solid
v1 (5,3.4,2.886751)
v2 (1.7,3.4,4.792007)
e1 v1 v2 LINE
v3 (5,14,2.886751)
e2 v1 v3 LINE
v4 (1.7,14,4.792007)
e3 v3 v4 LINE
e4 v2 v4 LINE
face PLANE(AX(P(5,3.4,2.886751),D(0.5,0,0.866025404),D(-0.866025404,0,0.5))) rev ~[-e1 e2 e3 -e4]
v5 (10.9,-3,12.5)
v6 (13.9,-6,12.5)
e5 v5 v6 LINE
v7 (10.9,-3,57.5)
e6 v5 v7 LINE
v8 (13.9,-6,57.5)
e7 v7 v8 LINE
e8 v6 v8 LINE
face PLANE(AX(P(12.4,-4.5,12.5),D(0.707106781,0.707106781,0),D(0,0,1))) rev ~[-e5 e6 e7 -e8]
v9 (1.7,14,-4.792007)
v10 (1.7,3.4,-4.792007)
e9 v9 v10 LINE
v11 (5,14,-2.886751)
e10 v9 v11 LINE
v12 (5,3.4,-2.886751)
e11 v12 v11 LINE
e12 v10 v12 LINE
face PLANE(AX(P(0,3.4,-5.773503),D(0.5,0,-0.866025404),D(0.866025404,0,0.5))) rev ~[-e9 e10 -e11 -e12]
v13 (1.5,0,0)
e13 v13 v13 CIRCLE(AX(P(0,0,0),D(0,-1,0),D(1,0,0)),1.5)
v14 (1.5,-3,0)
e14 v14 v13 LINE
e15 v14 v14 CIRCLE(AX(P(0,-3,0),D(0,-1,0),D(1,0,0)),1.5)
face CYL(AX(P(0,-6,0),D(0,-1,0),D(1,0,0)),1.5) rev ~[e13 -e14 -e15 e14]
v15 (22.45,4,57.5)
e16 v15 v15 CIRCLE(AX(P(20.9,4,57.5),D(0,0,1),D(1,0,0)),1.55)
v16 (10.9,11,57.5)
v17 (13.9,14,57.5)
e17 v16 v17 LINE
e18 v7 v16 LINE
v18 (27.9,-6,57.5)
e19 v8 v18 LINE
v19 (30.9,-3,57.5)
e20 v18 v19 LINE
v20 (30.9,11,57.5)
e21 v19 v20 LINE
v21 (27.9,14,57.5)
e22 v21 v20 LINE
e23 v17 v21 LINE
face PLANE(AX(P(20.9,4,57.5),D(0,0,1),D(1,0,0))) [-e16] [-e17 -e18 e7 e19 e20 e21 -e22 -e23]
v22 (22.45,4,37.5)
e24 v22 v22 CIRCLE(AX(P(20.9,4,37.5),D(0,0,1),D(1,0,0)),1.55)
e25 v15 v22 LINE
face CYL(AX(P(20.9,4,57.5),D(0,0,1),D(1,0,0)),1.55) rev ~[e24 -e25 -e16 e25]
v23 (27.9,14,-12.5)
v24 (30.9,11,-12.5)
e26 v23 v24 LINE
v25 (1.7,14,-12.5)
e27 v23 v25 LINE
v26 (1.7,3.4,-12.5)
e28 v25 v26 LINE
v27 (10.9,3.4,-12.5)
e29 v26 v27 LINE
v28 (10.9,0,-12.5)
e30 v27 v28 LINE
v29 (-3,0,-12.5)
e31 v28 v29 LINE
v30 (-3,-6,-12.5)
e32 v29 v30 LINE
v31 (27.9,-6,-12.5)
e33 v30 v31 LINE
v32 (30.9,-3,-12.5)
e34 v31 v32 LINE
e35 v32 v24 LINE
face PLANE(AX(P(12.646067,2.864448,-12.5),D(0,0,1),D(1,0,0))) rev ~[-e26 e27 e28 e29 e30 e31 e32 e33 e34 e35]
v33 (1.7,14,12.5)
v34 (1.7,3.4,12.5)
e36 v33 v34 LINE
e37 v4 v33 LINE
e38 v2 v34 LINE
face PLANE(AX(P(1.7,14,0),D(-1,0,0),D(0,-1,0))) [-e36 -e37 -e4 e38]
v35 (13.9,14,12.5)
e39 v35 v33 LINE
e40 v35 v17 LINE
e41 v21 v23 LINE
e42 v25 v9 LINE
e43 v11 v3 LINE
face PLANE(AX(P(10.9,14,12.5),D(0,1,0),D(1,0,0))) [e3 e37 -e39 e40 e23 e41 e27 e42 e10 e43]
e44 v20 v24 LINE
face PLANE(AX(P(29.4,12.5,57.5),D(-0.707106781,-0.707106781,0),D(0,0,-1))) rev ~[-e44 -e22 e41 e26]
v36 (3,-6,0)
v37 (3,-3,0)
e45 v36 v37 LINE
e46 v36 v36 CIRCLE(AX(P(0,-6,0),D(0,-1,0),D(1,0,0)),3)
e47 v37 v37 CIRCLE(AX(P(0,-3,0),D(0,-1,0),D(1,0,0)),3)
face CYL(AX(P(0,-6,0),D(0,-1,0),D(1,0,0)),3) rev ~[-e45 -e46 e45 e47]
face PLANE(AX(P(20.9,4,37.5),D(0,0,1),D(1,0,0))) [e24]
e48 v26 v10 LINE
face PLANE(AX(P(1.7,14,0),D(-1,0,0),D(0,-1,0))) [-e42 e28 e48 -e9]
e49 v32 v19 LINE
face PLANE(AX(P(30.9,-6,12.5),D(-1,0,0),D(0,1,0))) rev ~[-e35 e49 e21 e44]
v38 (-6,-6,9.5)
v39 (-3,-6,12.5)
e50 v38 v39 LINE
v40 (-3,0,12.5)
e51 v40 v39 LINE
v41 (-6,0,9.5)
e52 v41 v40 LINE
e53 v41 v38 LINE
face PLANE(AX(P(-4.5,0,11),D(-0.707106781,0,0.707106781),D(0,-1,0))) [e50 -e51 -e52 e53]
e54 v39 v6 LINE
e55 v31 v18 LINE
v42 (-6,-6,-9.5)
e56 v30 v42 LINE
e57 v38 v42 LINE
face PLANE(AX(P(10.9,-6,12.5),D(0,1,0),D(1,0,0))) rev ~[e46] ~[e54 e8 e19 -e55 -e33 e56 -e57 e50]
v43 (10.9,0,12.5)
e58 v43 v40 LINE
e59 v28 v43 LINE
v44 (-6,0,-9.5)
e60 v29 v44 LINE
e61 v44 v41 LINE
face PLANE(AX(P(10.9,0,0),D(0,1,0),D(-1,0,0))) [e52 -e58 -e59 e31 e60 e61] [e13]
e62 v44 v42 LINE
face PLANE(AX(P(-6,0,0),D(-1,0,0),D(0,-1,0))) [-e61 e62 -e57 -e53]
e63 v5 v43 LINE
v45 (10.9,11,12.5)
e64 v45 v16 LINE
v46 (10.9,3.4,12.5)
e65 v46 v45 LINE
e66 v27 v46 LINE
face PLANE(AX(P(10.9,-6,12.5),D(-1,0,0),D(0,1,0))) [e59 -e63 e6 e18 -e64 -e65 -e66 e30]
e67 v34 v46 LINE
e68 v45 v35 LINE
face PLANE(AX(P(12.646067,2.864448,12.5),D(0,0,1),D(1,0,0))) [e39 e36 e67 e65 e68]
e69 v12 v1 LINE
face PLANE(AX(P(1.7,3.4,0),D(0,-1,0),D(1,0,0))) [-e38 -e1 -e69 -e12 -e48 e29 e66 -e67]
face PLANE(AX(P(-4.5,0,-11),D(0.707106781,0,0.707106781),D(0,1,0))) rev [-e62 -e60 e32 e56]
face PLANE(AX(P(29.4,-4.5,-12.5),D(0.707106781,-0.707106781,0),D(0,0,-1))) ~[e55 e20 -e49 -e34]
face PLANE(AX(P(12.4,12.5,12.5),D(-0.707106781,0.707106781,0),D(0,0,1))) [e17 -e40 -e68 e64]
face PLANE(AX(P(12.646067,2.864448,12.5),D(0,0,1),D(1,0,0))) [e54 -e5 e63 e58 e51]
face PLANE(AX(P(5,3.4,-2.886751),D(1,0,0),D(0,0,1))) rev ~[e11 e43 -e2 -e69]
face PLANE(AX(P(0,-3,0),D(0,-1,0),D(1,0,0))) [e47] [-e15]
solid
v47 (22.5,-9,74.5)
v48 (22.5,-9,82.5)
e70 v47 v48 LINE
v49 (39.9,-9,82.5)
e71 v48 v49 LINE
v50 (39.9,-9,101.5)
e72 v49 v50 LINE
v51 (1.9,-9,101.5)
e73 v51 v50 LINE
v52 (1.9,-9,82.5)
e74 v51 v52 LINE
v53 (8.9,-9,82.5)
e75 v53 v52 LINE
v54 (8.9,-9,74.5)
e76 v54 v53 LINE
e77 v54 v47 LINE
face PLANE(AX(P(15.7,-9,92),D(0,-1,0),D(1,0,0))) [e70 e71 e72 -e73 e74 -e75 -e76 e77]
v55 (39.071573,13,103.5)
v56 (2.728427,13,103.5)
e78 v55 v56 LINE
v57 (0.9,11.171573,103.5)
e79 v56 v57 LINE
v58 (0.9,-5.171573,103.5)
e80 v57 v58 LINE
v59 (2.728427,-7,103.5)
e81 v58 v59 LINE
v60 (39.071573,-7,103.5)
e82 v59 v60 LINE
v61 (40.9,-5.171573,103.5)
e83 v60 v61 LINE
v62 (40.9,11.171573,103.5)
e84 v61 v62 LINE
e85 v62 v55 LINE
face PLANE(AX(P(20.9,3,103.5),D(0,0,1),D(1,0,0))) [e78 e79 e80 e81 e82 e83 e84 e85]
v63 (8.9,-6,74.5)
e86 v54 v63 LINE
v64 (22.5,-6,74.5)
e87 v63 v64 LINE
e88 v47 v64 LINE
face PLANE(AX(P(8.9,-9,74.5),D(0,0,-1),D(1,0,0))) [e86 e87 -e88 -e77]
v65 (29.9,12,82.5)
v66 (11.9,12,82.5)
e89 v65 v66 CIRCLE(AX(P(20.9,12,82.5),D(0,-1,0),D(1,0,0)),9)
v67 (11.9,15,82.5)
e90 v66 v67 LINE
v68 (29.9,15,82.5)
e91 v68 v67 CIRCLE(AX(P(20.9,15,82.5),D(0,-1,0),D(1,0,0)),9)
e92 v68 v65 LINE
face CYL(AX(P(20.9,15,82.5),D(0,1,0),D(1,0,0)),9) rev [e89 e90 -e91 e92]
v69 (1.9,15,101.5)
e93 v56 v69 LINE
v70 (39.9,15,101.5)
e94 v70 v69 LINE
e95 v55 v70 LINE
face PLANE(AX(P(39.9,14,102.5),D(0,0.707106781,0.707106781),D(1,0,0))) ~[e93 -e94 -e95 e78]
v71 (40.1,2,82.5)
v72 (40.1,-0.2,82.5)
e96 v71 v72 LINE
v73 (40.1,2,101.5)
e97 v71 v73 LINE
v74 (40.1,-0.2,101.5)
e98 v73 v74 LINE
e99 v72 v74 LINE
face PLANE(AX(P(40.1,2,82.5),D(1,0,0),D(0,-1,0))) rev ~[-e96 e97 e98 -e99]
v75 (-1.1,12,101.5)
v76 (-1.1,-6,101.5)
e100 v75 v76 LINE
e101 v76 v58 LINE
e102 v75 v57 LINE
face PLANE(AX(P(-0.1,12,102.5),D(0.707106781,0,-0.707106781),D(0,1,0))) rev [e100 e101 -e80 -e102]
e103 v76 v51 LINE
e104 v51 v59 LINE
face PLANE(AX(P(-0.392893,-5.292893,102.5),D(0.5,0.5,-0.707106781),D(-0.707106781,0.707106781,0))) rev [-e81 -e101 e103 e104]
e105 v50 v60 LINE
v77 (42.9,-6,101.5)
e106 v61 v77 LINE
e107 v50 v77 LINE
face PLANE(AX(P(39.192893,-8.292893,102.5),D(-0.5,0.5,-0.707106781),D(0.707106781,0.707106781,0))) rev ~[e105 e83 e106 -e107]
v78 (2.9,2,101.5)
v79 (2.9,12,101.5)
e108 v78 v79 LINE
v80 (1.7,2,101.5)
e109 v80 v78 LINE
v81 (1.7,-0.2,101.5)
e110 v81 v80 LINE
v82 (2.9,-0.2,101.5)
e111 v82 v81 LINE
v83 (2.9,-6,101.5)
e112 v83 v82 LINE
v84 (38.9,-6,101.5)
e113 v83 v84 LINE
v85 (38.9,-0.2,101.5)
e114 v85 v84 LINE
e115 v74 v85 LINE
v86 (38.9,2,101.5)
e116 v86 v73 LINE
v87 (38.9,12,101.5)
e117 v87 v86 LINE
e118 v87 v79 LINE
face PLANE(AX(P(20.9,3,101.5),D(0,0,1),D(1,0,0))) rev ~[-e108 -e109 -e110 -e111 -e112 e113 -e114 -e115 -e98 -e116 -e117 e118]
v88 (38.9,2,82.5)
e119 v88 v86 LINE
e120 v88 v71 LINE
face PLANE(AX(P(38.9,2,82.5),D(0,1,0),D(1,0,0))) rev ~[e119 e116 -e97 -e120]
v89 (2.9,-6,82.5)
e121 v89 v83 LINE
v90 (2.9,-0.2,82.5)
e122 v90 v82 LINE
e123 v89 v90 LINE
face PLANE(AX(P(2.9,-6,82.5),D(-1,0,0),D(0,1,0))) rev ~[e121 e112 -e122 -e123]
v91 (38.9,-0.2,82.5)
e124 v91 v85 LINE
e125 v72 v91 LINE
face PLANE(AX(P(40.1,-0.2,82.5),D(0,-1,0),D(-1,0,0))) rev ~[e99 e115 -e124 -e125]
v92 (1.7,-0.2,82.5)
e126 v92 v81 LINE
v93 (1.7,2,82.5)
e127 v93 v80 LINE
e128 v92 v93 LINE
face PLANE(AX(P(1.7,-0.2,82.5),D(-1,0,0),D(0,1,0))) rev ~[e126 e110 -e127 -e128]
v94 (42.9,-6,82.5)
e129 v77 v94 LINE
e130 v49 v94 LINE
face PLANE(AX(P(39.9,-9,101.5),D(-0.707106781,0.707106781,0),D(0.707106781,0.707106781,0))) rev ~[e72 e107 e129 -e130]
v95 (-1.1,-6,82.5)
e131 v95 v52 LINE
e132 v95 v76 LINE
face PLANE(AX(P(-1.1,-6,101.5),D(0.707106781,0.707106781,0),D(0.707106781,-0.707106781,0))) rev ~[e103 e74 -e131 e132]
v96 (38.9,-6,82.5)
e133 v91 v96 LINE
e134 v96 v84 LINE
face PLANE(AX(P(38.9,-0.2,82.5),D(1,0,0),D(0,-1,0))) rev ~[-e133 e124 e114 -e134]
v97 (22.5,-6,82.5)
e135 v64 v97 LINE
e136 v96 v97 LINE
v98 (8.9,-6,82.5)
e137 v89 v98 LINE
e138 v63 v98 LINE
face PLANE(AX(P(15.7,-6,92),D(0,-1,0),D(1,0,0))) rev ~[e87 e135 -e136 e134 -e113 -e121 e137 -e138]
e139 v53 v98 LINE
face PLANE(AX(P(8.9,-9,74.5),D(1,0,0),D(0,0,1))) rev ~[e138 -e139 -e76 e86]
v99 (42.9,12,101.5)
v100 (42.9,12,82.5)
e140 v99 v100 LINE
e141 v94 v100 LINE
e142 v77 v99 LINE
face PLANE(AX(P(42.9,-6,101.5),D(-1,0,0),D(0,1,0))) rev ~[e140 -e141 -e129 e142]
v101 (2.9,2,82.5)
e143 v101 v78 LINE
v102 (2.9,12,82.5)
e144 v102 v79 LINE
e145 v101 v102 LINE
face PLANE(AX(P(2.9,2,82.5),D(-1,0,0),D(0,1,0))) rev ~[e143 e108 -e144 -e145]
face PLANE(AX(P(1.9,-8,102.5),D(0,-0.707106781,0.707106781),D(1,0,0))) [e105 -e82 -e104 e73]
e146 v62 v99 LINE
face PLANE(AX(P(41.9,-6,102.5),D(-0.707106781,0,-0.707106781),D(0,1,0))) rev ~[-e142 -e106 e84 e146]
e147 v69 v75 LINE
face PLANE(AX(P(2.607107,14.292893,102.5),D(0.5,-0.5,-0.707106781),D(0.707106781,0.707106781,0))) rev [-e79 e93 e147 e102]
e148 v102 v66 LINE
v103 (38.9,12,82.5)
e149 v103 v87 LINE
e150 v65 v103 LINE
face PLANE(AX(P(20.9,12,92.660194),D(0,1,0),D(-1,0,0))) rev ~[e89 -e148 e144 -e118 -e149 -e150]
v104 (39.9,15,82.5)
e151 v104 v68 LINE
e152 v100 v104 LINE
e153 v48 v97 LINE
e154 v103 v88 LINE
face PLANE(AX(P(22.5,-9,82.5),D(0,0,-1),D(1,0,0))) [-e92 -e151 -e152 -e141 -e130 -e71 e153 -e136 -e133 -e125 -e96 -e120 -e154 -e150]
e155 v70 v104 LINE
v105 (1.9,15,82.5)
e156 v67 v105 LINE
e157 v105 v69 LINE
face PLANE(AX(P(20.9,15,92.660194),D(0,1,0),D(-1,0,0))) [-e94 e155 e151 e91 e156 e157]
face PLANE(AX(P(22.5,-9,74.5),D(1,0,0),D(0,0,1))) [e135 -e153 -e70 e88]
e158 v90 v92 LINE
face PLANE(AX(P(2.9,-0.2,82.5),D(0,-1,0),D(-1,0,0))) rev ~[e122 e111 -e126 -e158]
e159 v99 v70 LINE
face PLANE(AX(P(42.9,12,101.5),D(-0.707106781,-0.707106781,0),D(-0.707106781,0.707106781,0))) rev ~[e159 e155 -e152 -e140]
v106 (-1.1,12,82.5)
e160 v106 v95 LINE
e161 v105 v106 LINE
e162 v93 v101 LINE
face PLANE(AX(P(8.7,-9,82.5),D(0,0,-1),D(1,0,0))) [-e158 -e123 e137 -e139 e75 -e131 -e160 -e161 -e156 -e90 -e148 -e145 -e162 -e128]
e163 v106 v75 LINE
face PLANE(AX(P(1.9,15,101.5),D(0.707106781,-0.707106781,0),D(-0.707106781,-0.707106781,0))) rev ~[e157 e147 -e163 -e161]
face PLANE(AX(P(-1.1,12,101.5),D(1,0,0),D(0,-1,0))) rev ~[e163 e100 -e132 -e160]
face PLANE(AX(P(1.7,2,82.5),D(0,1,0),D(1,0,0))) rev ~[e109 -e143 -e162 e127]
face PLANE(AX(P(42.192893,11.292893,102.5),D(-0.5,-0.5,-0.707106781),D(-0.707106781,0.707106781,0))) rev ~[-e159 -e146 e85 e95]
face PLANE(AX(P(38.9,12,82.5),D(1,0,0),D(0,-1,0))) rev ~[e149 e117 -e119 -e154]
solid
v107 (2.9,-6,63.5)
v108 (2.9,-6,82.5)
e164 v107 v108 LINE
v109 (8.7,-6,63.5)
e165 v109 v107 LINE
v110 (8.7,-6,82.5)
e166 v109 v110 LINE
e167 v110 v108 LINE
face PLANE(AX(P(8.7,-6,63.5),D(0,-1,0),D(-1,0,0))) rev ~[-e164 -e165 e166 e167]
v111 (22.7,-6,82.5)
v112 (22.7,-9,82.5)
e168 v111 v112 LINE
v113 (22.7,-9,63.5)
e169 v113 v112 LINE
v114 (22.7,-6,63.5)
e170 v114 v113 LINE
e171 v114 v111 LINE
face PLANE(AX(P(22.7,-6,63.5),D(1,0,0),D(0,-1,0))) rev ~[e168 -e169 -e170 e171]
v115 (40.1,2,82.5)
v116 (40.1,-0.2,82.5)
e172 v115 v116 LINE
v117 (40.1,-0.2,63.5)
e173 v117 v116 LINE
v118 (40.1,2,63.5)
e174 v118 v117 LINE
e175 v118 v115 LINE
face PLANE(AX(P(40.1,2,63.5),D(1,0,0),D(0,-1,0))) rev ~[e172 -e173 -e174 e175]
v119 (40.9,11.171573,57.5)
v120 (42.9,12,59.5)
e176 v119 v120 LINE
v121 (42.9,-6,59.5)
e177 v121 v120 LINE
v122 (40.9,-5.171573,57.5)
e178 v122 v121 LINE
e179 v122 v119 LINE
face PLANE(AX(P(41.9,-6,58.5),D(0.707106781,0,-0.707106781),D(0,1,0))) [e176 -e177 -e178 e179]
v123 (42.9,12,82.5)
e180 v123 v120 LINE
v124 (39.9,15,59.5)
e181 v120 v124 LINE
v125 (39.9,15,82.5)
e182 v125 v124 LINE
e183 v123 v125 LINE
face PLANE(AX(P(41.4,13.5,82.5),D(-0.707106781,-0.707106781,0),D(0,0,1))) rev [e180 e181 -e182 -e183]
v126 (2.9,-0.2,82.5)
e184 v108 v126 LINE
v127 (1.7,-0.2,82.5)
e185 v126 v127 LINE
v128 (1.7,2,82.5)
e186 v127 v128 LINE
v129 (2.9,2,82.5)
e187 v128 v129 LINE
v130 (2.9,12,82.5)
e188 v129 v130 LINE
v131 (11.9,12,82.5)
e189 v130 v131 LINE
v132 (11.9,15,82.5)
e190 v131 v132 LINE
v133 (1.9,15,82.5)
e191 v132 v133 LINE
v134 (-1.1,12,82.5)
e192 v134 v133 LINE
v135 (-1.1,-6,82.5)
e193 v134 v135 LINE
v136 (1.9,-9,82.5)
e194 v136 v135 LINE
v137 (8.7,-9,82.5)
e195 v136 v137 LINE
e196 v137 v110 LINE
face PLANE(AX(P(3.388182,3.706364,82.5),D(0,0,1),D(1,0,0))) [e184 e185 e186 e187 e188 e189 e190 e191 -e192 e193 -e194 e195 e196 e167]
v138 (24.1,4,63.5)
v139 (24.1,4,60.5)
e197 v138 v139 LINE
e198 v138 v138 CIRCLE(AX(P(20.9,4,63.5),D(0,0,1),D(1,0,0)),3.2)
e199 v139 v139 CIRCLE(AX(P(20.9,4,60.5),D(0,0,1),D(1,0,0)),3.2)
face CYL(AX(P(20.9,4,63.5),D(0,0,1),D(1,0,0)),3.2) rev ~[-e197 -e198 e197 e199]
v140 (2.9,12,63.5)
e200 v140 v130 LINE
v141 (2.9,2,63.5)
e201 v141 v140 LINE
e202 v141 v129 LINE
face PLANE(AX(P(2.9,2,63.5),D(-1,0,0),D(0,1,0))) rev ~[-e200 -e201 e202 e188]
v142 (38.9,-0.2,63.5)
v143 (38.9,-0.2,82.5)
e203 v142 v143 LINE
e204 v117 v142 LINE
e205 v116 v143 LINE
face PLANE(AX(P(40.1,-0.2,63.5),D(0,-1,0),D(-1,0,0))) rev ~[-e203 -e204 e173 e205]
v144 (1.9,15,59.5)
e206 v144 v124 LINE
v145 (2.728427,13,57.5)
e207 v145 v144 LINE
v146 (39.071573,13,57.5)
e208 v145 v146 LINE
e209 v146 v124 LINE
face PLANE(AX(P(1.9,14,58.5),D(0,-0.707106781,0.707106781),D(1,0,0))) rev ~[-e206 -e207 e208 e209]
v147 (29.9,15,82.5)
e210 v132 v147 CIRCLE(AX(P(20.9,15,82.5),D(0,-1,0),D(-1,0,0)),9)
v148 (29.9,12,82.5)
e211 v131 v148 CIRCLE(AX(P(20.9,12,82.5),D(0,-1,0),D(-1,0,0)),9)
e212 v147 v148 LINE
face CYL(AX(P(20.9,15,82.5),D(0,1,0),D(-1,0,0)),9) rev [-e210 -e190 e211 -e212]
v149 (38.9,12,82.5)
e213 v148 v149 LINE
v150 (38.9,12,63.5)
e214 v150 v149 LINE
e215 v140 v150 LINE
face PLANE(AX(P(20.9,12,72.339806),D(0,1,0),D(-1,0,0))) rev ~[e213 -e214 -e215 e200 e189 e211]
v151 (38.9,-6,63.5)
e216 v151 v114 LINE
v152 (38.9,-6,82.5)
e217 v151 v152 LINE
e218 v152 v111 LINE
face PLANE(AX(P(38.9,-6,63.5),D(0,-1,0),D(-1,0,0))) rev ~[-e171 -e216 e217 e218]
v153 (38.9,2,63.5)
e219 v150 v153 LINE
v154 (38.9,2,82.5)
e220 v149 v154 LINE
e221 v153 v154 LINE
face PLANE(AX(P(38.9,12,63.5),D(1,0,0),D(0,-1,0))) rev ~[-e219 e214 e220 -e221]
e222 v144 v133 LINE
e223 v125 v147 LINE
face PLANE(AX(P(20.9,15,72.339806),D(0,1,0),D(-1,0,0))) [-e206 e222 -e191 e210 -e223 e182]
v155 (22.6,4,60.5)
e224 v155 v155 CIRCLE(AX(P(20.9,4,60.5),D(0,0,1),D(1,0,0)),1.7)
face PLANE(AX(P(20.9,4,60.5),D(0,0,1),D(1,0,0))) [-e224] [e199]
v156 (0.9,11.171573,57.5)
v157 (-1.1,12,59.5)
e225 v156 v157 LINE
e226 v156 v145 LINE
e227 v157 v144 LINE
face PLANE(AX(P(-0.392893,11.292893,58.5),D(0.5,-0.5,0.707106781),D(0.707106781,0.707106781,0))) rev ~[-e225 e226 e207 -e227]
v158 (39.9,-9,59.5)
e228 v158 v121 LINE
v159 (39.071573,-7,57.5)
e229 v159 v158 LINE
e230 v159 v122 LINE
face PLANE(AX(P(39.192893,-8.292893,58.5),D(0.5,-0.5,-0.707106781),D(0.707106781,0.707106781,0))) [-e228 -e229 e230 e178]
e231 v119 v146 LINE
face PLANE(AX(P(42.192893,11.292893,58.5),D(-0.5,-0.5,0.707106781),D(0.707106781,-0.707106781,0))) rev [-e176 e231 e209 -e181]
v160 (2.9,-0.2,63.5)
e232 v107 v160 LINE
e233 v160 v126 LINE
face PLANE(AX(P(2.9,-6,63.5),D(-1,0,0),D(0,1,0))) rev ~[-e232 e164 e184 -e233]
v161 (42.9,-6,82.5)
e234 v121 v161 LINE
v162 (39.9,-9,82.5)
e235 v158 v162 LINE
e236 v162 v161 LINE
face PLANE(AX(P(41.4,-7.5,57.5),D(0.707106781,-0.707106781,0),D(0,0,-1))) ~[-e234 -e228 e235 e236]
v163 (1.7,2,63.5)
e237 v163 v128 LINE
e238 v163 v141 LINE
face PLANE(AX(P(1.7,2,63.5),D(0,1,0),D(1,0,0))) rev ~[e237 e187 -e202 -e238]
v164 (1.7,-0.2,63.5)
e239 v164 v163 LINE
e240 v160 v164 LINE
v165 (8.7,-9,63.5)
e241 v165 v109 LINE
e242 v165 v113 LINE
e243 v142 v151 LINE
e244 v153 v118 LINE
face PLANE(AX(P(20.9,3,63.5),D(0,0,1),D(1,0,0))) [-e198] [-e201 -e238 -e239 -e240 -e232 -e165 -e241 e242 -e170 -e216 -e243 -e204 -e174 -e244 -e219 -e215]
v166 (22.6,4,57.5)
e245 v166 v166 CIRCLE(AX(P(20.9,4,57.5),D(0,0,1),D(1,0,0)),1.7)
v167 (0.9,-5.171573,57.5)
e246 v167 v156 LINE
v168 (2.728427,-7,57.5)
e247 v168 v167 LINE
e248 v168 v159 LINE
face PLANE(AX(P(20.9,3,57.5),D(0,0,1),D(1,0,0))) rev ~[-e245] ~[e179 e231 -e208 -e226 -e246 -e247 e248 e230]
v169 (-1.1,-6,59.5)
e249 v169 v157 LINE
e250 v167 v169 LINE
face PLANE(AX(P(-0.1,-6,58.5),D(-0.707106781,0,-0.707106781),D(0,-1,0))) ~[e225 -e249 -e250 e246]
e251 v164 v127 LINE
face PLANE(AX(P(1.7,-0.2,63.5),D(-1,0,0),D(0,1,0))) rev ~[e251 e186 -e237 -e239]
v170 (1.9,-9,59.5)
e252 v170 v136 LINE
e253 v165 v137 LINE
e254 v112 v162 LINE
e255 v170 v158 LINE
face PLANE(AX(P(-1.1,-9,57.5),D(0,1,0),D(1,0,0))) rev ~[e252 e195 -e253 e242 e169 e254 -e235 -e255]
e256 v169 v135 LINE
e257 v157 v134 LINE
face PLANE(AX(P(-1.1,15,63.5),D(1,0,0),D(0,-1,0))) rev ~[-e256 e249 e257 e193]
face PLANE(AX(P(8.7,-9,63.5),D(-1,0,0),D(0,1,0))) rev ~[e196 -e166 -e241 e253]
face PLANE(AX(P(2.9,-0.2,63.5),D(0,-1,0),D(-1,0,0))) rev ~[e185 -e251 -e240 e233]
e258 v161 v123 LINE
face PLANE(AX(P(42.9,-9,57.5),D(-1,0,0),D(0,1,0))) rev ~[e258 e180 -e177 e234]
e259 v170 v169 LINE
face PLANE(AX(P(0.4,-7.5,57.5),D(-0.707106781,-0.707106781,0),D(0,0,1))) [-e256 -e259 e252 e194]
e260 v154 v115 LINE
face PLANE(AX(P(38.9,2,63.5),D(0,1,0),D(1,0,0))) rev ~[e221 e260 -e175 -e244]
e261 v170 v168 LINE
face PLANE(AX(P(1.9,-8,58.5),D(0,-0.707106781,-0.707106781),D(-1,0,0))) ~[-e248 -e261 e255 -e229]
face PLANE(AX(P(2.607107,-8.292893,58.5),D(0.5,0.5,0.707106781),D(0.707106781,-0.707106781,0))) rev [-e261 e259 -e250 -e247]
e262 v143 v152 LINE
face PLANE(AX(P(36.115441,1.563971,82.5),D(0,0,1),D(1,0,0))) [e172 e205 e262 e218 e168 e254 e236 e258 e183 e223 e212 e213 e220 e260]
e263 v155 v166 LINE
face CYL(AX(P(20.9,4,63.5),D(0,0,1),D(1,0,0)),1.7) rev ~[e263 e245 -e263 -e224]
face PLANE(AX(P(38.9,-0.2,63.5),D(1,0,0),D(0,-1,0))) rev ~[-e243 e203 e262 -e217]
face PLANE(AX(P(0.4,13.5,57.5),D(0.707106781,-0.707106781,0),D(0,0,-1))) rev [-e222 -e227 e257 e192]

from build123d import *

# Parameters (mm, degrees)
F1_DEPTH   = 12.5
F2_R       = 1.5
F3_DEPTH   = 6
F4_R       = 3
F5_DEPTH   = 3
F7_DEPTH   = 10.6
F8_W       = 20
F8_H       = 20
F9_DEPTH   = 45
F10_R      = 1.55
F11_DEPTH  = 20
F12_SIZE   = 3
F13_W      = 44
F13_H      = 24
F14_DEPTH  = 6
F16_DEPTH  = 19
F18_DEPTH  = 3
F19_SIZE   = 3
F21_DEPTH  = 19
F23_DEPTH  = 2
F24_W      = 13.6
F24_H      = 8
F25_DEPTH  = 3
F27_DEPTH  = 3
F28_SIZE   = 2
F28_2_SIZE = 2
F29_R      = 1.7
F30_DEPTH  = 6
F31_R      = 3.2
F32_DEPTH  = 3
F33_SIZE   = 3


with BuildPart() as f1:
    # F0 (on Top) → F1 (new body, symmetric)
    with BuildSketch(Plane.XY):
        Polygon((30.9, 14), (1.7, 14), (1.7, 3.4), (10.9, 3.4), (10.9, 0), (-6, 0), (-6, -6), (30.9, -6), align=None)
    extrude(amount=F1_DEPTH, both=True)

    # F2 (on face) → F3 (cut, through all)
    with BuildSketch(Plane.XZ.offset(6)):
        Circle(F2_R)
    extrude(amount=-F3_DEPTH, mode=Mode.SUBTRACT)

    # F4 (on face) → F5 (cut)
    with BuildSketch(Plane.XZ.offset(6)):
        Circle(F4_R)
    extrude(amount=-F5_DEPTH, mode=Mode.SUBTRACT)

    # F6 (on face) → F7 (cut, through all)
    with BuildSketch(Plane.XZ.offset(-3.4)):
        Polygon((5, -2.8867513459), (5, 2.8867513459), (0, 5.7735026919), (-5, 2.8867513459), (-5, -2.8867513459), (0, -5.7735026919), align=None)
    extrude(amount=-F7_DEPTH, mode=Mode.SUBTRACT)

    # F8 (on face) → F9 (join)
    with BuildSketch(Plane.XY.offset(12.5)):
        with Locations((20.9, 4)):
            Rectangle(F8_W, F8_H)
    extrude(amount=F9_DEPTH)

    # F10 (on face) → F11 (cut)
    with BuildSketch(Plane.XY.offset(57.5)):
        with Locations((20.9, 4)):
            Circle(F10_R)
    extrude(amount=-F11_DEPTH, mode=Mode.SUBTRACT)

    # F12
    f12_edges = [f1.edges().sort_by_distance(p)[0] for p in [
        (10.9, 14, 35),
        (10.9, -6, 35),
        (30.9, -6, 22.5),
        (30.9, 14, 22.5),
    ]]
    chamfer(f12_edges, length=F12_SIZE)

    # F33
    f33_edges = [f1.edges().sort_by_distance(p)[0] for p in [
        (-6, -3, 12.5),
        (-6, -3, -12.5),
    ]]
    chamfer(f33_edges, length=F33_SIZE)


with BuildPart() as f14:
    # F13 (on face) → F14 (new body)
    with BuildSketch(Plane.XY.offset(57.5)):
        with Locations((20.9, 3)):
            Rectangle(F13_W, F13_H)
    extrude(amount=F14_DEPTH)

    # F15 (on face) → F16 (join)
    with BuildSketch(Plane.XY.offset(63.5)):
        Polygon((11.9, 12), (11.9, 15), (-1.1, 15), (-1.1, -9), (8.7, -9), (8.7, -6), (2.9, -6), (2.9, -0.2), (1.7, -0.2), (1.7, 2), (2.9, 2), (2.9, 12), align=None)
        Polygon((42.9, 15), (29.9, 15), (29.9, 12), (38.9, 12), (38.9, 2), (40.1, 2), (40.1, -0.2), (38.9, -0.2), (38.9, -6), (22.7, -6), (22.7, -9), (42.9, -9), align=None)
    extrude(amount=F16_DEPTH)

    # F17 (on face) → F18 (join, through all)
    with BuildSketch(Plane(origin=(0, 15, 0), x_dir=(-1, 0, 0), z_dir=(0, 1, 0))):
        with BuildLine():
            ThreePointArc((-11.9, 82.5), (-20.9, 73.5), (-29.9, 82.5))
            Line((-29.9, 82.5), (-29.9, 63.5))
            Line((-29.9, 63.5), (-11.9, 63.5))
            Line((-11.9, 63.5), (-11.9, 82.5))
        make_face()
    extrude(amount=-F18_DEPTH)

    # F19
    f19_edges = [f14.edges().sort_by_distance(p)[0] for p in [
        (42.9, 15, 70),
        (-1.1, 15, 70),
        (-1.1, -9, 70),
        (42.9, -9, 70),
    ]]
    chamfer(f19_edges, length=F19_SIZE)

    # F28
    f28_edges = [f14.edges().sort_by_distance(p)[0] for p in [
        (20.9, 15, 57.5),
        (41.4, 13.5, 57.5),
        (0.4, 13.5, 57.5),
        (42.9, 3, 57.5),
        (-1.1, 3, 57.5),
        (41.4, -7.5, 57.5),
        (0.4, -7.5, 57.5),
        (20.9, -9, 57.5),
    ]]
    chamfer(f28_edges, length=F28_SIZE)

    # F29 (on face) → F30 (cut, through all)
    with BuildSketch(Plane.XY.offset(63.5)):
        with Locations((20.9, 4)):
            Circle(F29_R)
    extrude(amount=-F30_DEPTH, mode=Mode.SUBTRACT)

    # F31 (on face) → F32 (cut)
    with BuildSketch(Plane.XY.offset(63.5)):
        with Locations((20.9, 4)):
            Circle(F31_R)
    extrude(amount=-F32_DEPTH, mode=Mode.SUBTRACT)


with BuildPart() as f21:
    # F20 (on face) → F21 (new body)
    with BuildSketch(Plane.XY.offset(82.5)):
        Polygon((11.9, 15), (1.9, 15), (-1.1, 12), (-1.1, -6), (1.9, -9), (8.7, -9), (8.7, -6), (2.9, -6), (2.9, -0.2), (1.7, -0.2), (1.7, 2), (2.9, 2), (2.9, 12), (11.9, 12), align=None)
    extrude(amount=F21_DEPTH)



with BuildPart() as f21b:
    # F20 (on face) → F21, piece 2 (new body)
    with BuildSketch(Plane.XY.offset(82.5)):
        Polygon((42.9, 12), (39.9, 15), (29.9, 15), (29.9, 12), (38.9, 12), (38.9, 2), (40.1, 2), (40.1, -0.2), (38.9, -0.2), (38.9, -6), (22.7, -6), (22.7, -9), (39.9, -9), (42.9, -6), align=None)
    extrude(amount=F21_DEPTH)


with BuildPart() as f21_1:
    add(f21.part)

    add(f21b.part)  # F23 merges F21b
    # F22 (on face) → F23 (join)
    with BuildSketch(Plane.XY.offset(101.5)):
        Polygon((39.9, 15), (1.9, 15), (-1.1, 12), (-1.1, -6), (1.9, -9), (39.9, -9), (42.9, -6), (42.9, 12), align=None)
    extrude(amount=F23_DEPTH)

    # F24 (on face) → F25 (join, through all)
    with BuildSketch(Plane.XZ.offset(9)):
        Polygon((22.7, 101.5), (8.7, 101.5), (8.7, 82.5), (8.9, 82.5), (22.5, 82.5), (22.7, 82.5), align=None)
        with Locations((15.7, 78.5)):
            Rectangle(F24_W, F24_H)
    extrude(amount=-F25_DEPTH)

    # F26 (on face) → F27 (join, through all)
    with BuildSketch(Plane(origin=(0, 15, 0), x_dir=(-1, 0, 0), z_dir=(0, 1, 0))):
        with BuildLine():
            ThreePointArc((-29.9, 82.5), (-20.9, 91.5), (-11.9, 82.5))
            Line((-11.9, 82.5), (-11.9, 101.5))
            Line((-11.9, 101.5), (-29.9, 101.5))
            Line((-29.9, 101.5), (-29.9, 82.5))
        make_face()
    extrude(amount=-F27_DEPTH)

    # F28#2
    f28_2_edges = [f21_1.edges().sort_by_distance(p)[0] for p in [
        (20.9, 15, 103.5),
        (0.4, 13.5, 103.5),
        (-1.1, 3, 103.5),
        (0.4, -7.5, 103.5),
        (20.9, -9, 103.5),
        (41.4, -7.5, 103.5),
        (42.9, 3, 103.5),
        (41.4, 13.5, 103.5),
    ]]
    chamfer(f28_2_edges, length=F28_2_SIZE)


solid = Compound([f1.part, f14.part, f21_1.part])
